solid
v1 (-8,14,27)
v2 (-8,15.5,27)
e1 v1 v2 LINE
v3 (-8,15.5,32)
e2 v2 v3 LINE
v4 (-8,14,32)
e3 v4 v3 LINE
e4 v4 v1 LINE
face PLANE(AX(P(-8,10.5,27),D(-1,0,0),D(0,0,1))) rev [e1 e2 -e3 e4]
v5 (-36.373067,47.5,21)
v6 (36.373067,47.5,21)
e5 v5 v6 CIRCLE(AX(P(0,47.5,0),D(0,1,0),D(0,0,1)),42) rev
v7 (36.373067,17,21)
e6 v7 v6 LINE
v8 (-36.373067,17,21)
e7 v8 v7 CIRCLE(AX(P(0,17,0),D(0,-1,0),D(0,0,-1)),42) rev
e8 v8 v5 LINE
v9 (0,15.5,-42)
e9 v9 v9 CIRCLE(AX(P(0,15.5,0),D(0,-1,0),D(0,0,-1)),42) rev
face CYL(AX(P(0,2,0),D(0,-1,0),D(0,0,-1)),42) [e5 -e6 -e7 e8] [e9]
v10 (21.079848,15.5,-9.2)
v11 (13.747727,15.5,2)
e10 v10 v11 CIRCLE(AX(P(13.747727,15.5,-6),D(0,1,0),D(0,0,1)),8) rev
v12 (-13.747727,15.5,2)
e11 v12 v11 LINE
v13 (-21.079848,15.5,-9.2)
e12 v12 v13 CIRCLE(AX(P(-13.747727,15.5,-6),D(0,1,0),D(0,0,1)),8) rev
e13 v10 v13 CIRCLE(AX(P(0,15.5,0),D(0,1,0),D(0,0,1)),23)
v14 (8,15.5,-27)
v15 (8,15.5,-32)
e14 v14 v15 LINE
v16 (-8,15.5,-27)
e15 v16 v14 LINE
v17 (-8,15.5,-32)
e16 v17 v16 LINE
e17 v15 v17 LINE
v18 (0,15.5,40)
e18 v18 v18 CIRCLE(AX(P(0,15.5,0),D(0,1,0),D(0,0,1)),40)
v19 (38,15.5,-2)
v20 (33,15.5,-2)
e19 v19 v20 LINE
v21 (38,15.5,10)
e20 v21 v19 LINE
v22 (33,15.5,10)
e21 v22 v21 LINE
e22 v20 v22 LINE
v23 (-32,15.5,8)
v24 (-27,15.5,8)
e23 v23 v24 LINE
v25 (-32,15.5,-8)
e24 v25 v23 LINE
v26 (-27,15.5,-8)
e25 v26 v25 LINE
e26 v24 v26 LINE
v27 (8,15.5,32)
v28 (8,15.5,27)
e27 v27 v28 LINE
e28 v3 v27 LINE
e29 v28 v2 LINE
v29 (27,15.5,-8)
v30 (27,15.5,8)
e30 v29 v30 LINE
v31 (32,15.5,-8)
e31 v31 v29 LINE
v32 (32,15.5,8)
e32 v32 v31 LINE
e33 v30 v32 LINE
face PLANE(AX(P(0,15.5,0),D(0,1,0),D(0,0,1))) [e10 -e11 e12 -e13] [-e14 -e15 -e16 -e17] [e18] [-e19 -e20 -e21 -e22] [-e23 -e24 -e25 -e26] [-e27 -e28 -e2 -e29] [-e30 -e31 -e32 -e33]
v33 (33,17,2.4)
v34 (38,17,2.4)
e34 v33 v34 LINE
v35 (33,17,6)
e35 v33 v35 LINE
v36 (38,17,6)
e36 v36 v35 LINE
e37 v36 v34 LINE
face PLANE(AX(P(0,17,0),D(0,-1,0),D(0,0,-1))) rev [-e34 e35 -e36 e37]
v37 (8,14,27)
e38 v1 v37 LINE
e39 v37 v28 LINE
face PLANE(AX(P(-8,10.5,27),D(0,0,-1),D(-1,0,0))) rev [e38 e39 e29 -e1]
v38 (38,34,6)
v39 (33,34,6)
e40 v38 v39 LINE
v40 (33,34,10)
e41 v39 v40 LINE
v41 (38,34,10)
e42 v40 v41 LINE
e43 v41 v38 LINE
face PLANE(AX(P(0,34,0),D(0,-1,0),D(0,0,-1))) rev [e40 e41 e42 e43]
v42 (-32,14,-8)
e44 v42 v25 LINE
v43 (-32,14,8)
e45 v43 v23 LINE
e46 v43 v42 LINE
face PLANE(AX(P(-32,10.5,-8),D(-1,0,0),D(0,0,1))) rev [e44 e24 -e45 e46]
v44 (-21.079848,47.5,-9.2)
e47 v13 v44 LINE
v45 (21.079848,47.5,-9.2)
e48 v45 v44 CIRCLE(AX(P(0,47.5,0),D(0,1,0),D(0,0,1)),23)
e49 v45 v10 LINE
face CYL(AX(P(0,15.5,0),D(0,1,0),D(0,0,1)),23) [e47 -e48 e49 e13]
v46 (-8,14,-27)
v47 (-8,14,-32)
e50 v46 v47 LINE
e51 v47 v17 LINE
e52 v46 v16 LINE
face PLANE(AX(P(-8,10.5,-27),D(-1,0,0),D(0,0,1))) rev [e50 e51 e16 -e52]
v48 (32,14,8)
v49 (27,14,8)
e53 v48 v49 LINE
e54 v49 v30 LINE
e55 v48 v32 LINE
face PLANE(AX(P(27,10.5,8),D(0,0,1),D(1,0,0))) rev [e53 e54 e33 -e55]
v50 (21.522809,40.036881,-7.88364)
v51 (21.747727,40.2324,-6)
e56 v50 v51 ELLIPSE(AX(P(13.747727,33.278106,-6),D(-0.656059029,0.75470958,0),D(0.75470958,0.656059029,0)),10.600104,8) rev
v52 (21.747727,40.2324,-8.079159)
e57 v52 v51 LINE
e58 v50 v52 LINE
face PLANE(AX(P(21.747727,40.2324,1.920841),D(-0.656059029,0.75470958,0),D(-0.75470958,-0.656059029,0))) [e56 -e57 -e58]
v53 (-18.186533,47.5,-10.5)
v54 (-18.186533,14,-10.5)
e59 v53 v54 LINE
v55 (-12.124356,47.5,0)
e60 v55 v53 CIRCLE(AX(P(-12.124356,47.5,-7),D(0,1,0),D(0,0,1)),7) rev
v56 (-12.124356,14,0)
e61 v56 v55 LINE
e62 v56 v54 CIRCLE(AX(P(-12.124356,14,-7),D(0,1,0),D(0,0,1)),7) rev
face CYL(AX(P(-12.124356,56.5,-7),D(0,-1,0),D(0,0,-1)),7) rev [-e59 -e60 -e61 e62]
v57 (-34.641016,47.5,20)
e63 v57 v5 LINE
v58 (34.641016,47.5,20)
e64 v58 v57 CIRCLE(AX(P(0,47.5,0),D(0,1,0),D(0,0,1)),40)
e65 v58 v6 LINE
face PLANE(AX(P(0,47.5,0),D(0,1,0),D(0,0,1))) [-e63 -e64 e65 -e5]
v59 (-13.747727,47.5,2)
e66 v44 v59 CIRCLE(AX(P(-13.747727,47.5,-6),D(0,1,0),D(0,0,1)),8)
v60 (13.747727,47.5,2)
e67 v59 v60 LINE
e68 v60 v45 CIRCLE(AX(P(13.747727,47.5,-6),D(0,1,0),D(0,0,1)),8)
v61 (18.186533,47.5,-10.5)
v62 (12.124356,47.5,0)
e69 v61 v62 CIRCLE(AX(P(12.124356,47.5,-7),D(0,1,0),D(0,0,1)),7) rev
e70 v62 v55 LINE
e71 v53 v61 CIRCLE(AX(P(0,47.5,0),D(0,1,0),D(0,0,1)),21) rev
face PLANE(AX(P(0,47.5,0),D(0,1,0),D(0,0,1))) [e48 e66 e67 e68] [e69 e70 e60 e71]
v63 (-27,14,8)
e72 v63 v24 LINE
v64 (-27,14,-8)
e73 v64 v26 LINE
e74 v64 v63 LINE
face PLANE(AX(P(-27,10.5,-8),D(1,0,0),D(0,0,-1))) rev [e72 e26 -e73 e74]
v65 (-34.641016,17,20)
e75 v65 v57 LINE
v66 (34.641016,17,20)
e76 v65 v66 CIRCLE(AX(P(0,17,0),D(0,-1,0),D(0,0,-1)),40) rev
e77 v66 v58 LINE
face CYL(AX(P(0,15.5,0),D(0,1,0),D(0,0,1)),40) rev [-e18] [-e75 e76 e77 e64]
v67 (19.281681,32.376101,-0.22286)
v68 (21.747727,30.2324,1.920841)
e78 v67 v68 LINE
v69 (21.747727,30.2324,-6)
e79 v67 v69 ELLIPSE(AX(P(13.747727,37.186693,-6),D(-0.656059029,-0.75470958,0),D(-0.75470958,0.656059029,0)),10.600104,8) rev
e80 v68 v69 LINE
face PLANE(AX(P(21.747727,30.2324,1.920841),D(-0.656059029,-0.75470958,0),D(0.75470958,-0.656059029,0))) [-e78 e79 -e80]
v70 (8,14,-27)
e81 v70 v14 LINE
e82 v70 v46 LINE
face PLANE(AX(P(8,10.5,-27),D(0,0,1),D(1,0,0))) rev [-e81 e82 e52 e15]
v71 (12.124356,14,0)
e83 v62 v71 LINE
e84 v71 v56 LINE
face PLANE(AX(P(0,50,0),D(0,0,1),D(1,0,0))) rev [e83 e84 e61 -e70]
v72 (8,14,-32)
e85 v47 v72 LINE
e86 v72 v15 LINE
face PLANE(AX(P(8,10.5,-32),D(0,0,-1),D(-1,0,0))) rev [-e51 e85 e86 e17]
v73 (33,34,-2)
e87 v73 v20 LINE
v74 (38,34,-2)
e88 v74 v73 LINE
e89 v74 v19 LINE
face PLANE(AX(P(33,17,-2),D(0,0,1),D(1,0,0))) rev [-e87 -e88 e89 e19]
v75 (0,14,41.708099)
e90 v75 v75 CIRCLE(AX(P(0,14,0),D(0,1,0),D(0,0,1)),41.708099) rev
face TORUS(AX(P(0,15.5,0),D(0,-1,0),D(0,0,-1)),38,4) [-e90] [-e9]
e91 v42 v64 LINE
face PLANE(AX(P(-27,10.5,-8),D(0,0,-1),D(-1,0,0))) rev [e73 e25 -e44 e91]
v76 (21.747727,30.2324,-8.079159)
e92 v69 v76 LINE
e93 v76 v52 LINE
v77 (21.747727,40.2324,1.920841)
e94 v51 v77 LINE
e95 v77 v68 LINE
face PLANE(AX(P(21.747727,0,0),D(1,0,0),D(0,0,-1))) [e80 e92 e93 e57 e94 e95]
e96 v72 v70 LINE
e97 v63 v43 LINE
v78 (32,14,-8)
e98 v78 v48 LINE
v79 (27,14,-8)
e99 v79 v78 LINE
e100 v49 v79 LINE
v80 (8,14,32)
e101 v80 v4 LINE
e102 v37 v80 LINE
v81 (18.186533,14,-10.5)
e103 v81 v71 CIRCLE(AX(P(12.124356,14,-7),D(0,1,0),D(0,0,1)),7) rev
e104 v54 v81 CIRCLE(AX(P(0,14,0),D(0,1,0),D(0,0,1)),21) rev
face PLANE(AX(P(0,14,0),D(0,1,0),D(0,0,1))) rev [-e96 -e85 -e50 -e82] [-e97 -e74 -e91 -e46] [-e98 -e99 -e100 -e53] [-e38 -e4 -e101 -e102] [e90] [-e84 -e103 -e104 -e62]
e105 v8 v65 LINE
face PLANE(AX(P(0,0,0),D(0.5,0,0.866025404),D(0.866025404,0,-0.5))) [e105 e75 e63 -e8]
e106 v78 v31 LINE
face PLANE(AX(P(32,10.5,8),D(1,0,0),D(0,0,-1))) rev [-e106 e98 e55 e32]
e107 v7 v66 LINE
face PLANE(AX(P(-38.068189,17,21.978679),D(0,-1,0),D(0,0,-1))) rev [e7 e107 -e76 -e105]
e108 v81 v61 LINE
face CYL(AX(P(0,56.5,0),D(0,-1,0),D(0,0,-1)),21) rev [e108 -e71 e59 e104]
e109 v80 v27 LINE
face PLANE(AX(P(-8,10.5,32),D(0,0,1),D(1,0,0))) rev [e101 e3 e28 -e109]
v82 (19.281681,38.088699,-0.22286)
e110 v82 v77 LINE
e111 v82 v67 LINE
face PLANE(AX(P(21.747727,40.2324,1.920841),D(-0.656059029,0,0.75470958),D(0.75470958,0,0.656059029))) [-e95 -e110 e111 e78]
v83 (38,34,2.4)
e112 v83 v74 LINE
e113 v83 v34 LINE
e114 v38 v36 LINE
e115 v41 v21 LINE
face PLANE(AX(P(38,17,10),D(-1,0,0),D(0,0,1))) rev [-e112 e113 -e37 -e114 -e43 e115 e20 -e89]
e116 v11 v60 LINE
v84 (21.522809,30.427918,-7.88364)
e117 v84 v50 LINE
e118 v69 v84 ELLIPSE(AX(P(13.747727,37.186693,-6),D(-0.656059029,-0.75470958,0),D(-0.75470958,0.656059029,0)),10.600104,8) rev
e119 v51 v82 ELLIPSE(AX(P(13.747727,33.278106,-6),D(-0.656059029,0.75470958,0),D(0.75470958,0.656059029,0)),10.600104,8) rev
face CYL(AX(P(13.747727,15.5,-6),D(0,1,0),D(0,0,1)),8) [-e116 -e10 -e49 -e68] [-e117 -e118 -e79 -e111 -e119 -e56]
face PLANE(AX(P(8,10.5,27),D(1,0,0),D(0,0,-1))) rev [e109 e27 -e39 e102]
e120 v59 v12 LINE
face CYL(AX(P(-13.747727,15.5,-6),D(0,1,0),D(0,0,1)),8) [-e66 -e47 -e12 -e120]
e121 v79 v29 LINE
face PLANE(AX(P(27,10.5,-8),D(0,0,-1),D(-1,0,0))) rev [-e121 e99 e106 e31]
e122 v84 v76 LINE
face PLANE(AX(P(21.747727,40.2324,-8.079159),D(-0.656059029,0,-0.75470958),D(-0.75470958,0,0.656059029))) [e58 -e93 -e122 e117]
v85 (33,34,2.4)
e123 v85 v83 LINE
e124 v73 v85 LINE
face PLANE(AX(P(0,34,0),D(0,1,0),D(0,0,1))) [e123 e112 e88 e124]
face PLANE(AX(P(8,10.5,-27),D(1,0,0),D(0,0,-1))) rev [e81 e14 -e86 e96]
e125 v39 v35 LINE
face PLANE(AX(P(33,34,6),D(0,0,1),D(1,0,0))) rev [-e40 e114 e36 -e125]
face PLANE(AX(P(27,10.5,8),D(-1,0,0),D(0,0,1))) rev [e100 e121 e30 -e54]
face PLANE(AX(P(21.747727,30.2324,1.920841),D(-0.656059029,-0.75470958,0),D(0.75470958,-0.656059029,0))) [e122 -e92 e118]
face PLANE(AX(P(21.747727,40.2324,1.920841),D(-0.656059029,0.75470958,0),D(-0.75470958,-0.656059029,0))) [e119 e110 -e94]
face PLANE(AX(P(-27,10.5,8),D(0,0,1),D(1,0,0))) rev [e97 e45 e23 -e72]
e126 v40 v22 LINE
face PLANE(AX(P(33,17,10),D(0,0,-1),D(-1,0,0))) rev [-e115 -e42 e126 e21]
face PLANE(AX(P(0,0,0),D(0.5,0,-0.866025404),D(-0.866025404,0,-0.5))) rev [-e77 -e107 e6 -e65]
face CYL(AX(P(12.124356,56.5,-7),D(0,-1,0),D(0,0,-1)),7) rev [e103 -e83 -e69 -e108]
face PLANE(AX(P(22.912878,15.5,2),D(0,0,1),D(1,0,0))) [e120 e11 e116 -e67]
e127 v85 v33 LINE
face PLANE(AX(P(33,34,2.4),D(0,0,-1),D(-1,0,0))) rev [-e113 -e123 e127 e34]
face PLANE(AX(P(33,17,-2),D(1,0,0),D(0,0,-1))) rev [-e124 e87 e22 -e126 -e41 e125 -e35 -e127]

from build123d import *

# Parameters (mm, degrees)
CUT_EXTRUDE1_DEPTH     = 5
CUT_EXTRUDE3_DEPTH     = 45
SKETCH8_R              = 40
CUT_EXTRUDE4_DEPTH     = 32
FILLET1_R              = 7
FILLET2_R              = 8
CUT_REVOLVE1_START     = 17
CUT_REVOLVE1_DEPTH     = 30.5
SKETCH18_W             = 13
SKETCH18_H             = 8
CUT_EXTRUDE13_DEPTH    = 5
SKETCH20_W             = 84
SKETCH20_H             = 7
CUT_EXTRUDE15_DEPTH    = 5
SKETCH19_R             = 1.5
CUT_EXTRUDE14_DEPTH    = 12
FILLET3_R              = 4
SKETCH21_W             = 16
SKETCH21_H             = 5
CUT_EXTRUDE16_DEPTH    = 5
CIRPATTERN1_COUNT      = 4
SKETCH22_W             = 5
SKETCH22_H             = 12
BOSS_EXTRUDE1_DEPTH    = 1.5
SKETCH23_W             = 5
SKETCH23_H             = 4.4
SKETCH23_H_2           = 4
BOSS_EXTRUDE2_DEPTH    = 17
SKETCH24_W             = 2
SKETCH24_H             = 3
BOSS_EXTRUDE3_DEPTH    = 2
CIRPATTERN2_COUNT      = 5
INTERSECT1_START       = 47.5
INTERSECT1_OUTLINE_R   = 42
INTERSECT1_OUTLINE_W   = 13
INTERSECT1_OUTLINE_H   = 8
INTERSECT1_DEPTH       = 7.5
INTERSECT2_OUTLINE_W   = 86
INTERSECT2_OUTLINE_H   = 86
INTERSECT2_OUTLINE_W_2 = 5
INTERSECT2_OUTLINE_H_2 = 16
INTERSECT2_OUTLINE_W_3 = 16
INTERSECT2_OUTLINE_H_3 = 5
INTERSECT2_DEPTH       = 14
SKETCH28_W             = 10
SKETCH28_H             = 10
BOSS_EXTRUDE4_DEPTH    = 2.5
BOSS_EXTRUDE4_DRAFT    = -41


# Read off the part's stored shape, not the designer's step: Cut-Revolve1, Intersect1, Intersect2
with BuildPart() as part:
    # Sketch1 → Revolve1 (revolve)
    with BuildSketch(Plane.XY, mode=Mode.PRIVATE) as revolve1_sk:
        with BuildLine():
            Line((37, 55), (0, 55))
            Line((0, 55), (0, 11.5))
            Line((0, 11.5), (22.5, 11.5))
            Line((22.5, 11.5), (22.5, 0))
            Line((22.5, 0), (25, 0))
            Line((25, 0), (25, 11.5))
            Line((25, 11.5), (42, 11.5))
            Line((42, 11.5), (42, 50))
            ThreePointArc((42, 50), (40.535533906, 53.535533906), (37, 55))
        make_face()
    revolve(revolve1_sk.sketch.rotate(Axis((0, 2, 0), (0, 1, 0)), 90), axis=Axis((0, 2, 0), (0, 1, 0)))

    # Sketch5 → Cut-Extrude1 (cut)
    with BuildSketch(Plane(origin=(0, 55, 0), x_dir=(1, 0, 0), z_dir=(0, 1, 0))):
        with BuildLine():
            Line((-42, 0), (-40, 0))
            Line((-40, 0), (40, 0))
            Line((40, 0), (42, 0))
            ThreePointArc((42, 0), (0, 42), (-42, 0))
        make_face()
    extrude(amount=-CUT_EXTRUDE1_DEPTH, mode=Mode.SUBTRACT)

    # Sketch7 → Cut-Extrude3 (cut)
    with BuildSketch(Plane.XZ.offset(-11.5)):
        with BuildLine():
            Line((-21, 0), (21, 0))
            ThreePointArc((21, 0), (0, -21), (-21, 0))
        make_face()
    extrude(amount=-CUT_EXTRUDE3_DEPTH, mode=Mode.SUBTRACT)

    # Sketch8 → Cut-Extrude4 (cut)
    with BuildSketch(Plane(origin=(0, 47.5, 0), x_dir=(1, 0, 0), z_dir=(0, 1, 0))):
        with Locations(Location((0, 0, 0), (0, 0, 270))):
            Circle(SKETCH8_R)
        with BuildLine():
            Line((22.912878475, -2), (-22.912878475, -2))
            ThreePointArc((-22.912878475, -2), (0, 23), (22.912878475, -2))
        make_face(mode=Mode.SUBTRACT)
    extrude(amount=-CUT_EXTRUDE4_DEPTH, mode=Mode.SUBTRACT)

    # Fillet1
    fillet1_edges = [part.edges().sort_by_distance(p)[0] for p in [
        (21, 30.75, 0),
        (-21, 30.75, 0),
    ]]
    fillet(fillet1_edges, radius=FILLET1_R)

    # Fillet2
    fillet2_edges = [part.edges().sort_by_distance(p)[0] for p in [
        (-22.912878475, 31.5, 2),
        (22.912878475, 31.5, 2),
    ]]
    fillet(fillet2_edges, radius=FILLET2_R)

    # Cut-Revolve1 outline → Cut-Revolve1 (cut)
    with BuildSketch(Plane(origin=(0, 0, 0), x_dir=(1, 0, 0), z_dir=(0, 1, 0)).offset(CUT_REVOLVE1_START)):
        with BuildLine():
            Line((-34.641016151, -20), (-36.373066959, -21))
            ThreePointArc((-36.373066959, -21), (0, -42), (36.373066959, -21))
            Line((36.373066959, -21), (34.641016151, -20))
            ThreePointArc((34.641016151, -20), (0, -40), (-34.641016151, -20))
        make_face()
    extrude(amount=CUT_REVOLVE1_DEPTH, mode=Mode.SUBTRACT)

    # Sketch18 → Cut-Extrude13 (cut)
    with BuildSketch(Plane(origin=(0, 50, 0), x_dir=(1, 0, 0), z_dir=(0, 1, 0))):
        with Locations((0.796512215, 32.951769165)):
            Rectangle(SKETCH18_W, SKETCH18_H)
    extrude(amount=-CUT_EXTRUDE13_DEPTH, mode=Mode.SUBTRACT)

    # Sketch20 → Cut-Extrude15 (cut)
    with BuildSketch(Plane(origin=(0, 55, 0), x_dir=(1, 0, 0), z_dir=(0, 1, 0))):
        with Locations((0, -3.5)):
            Rectangle(SKETCH20_W, SKETCH20_H)
    extrude(amount=-CUT_EXTRUDE15_DEPTH, mode=Mode.SUBTRACT)

    # Sketch19 → Cut-Extrude14 (cut)
    with BuildSketch(Plane(origin=(0, 0, 7), x_dir=(-1, 0, 0), z_dir=(0, 0, -1))):
        with Locations((0, 52.5)):
            Circle(SKETCH19_R)
        with Locations((-29.412558482, 52.5)):
            Circle(SKETCH19_R)
        with Locations((29.412558482, 52.5)):
            Circle(SKETCH19_R)
    extrude(amount=-CUT_EXTRUDE14_DEPTH, mode=Mode.SUBTRACT)

    # Fillet3
    fillet3_edges = [part.edges().sort_by_distance(p)[0] for p in [
        (0, 11.5, 42),
    ]]
    fillet(fillet3_edges, radius=FILLET3_R)

    # Sketch21 → Cut-Extrude16 (cut)
    with BuildSketch(Plane(origin=(0, 15.5, 0), x_dir=(1, 0, 0), z_dir=(0, 1, 0))):
        with Locations((0, -29.5)):
            Rectangle(SKETCH21_W, SKETCH21_H)
    cut_extrude16 = extrude(amount=-CUT_EXTRUDE16_DEPTH, mode=Mode.SUBTRACT)

    # CirPattern1: Cut-Extrude16 ×4 about axis
    cirpattern1_axis = Axis((0, 0, 0), (0, 1, 0))
    for i in range(1, CIRPATTERN1_COUNT):
        add(cut_extrude16.rotate(cirpattern1_axis, i * 360 / CIRPATTERN1_COUNT), mode=Mode.SUBTRACT)

    # Sketch22 → Boss-Extrude1 (add)
    with BuildSketch(Plane(origin=(0, 15.5, 0), x_dir=(1, 0, 0), z_dir=(0, 1, 0))):
        with Locations((35.5, -4)):
            Rectangle(SKETCH22_W, SKETCH22_H)
    extrude(amount=BOSS_EXTRUDE1_DEPTH)

    # Sketch23 → Boss-Extrude2 (add)
    with BuildSketch(Plane(origin=(0, 17, 0), x_dir=(1, 0, 0), z_dir=(0, 1, 0))):
        with Locations((35.5, -0.2)):
            Rectangle(SKETCH23_W, SKETCH23_H)
        with Locations((35.5, -8)):
            Rectangle(SKETCH23_W, SKETCH23_H_2)
    extrude(amount=BOSS_EXTRUDE2_DEPTH)

    # Sketch24 → Boss-Extrude3 (add)
    with BuildSketch(Plane.XZ):
        with Locations((0, -22.5)):
            Rectangle(SKETCH24_W, SKETCH24_H)
    boss_extrude3 = extrude(amount=-BOSS_EXTRUDE3_DEPTH)

    # CirPattern2: Boss-Extrude3 ×5 about axis
    cirpattern2_axis = Axis((0, 0, 0), (0, 1, 0))
    for i in range(1, CIRPATTERN2_COUNT):
        add(boss_extrude3.rotate(cirpattern2_axis, i * 360 / CIRPATTERN2_COUNT))

    # Intersect1 outline → Intersect1 (cut)
    with BuildSketch(Plane(origin=(0, 0, 0), x_dir=(1, 0, 0), z_dir=(0, 1, 0)).offset(INTERSECT1_START)):
        Circle(INTERSECT1_OUTLINE_R)
        with BuildLine():
            Line((12.124355653, 0), (-12.124355653, 0))
            ThreePointArc((-12.124355653, 0), (-18.186533479, 3.5), (-18.186533479, 10.5))
            ThreePointArc((-18.186533479, 10.5), (0, 21), (18.186533479, 10.5))
            ThreePointArc((18.186533479, 10.5), (18.186533479, 3.5), (12.124355653, 0))
        make_face(mode=Mode.SUBTRACT)
        with Locations((0.796512215, 32.951769165)):
            Rectangle(INTERSECT1_OUTLINE_W, INTERSECT1_OUTLINE_H, mode=Mode.SUBTRACT)
    extrude(amount=INTERSECT1_DEPTH, mode=Mode.SUBTRACT)

    # Intersect2 outline → Intersect2 (cut)
    with BuildSketch(Plane(origin=(0, 0, 0), x_dir=(1, 0, 0), z_dir=(0, 1, 0))):
        Rectangle(INTERSECT2_OUTLINE_W, INTERSECT2_OUTLINE_H)
        with Locations((29.5, 0)):
            Rectangle(INTERSECT2_OUTLINE_W_2, INTERSECT2_OUTLINE_H_2, mode=Mode.SUBTRACT)
        with Locations((0, -29.5)):
            Rectangle(INTERSECT2_OUTLINE_W_3, INTERSECT2_OUTLINE_H_3, mode=Mode.SUBTRACT)
        with Locations((0, 29.5)):
            Rectangle(INTERSECT2_OUTLINE_W_3, INTERSECT2_OUTLINE_H_3, mode=Mode.SUBTRACT)
        with Locations((-29.5, 0)):
            Rectangle(INTERSECT2_OUTLINE_W_2, INTERSECT2_OUTLINE_H_2, mode=Mode.SUBTRACT)
    extrude(amount=INTERSECT2_DEPTH, mode=Mode.SUBTRACT)


with BuildPart() as boss_extrude4_tool:
    # Sketch28 → Boss-Extrude4 (with draft: the straight prism first)
    with BuildSketch(Plane(origin=(21.747727085, 0, 0), x_dir=(0, 0, -1), z_dir=(1, 0, 0))):
        with Locations((3.079158512, 35.232399588)):
            Rectangle(SKETCH28_W, SKETCH28_H)
    extrude(amount=-BOSS_EXTRUDE4_DEPTH)
    # Boss-Extrude4: the draft: its side faces are tilted about the plane it starts from
    boss_extrude4_sides = [boss_extrude4_tool.faces().sort_by_distance(p)[0] for p in [
        (20.497727085, 35.232399588, 1.920841488),
        (20.497727085, 30.232399588, -3.079158512),
        (20.497727085, 35.232399588, -8.079158512),
        (20.497727085, 40.232399588, -3.079158512),
    ]]
    draft(boss_extrude4_sides, Plane(origin=(21.747727085, 0, 0), x_dir=(0, 0, -1), z_dir=(1, 0, 0)), BOSS_EXTRUDE4_DRAFT)


with BuildPart() as part_1:
    add(part.part)

    # Boss-Extrude4: add boss_extrude4_tool
    add(boss_extrude4_tool.part)


solid = part_1.part
